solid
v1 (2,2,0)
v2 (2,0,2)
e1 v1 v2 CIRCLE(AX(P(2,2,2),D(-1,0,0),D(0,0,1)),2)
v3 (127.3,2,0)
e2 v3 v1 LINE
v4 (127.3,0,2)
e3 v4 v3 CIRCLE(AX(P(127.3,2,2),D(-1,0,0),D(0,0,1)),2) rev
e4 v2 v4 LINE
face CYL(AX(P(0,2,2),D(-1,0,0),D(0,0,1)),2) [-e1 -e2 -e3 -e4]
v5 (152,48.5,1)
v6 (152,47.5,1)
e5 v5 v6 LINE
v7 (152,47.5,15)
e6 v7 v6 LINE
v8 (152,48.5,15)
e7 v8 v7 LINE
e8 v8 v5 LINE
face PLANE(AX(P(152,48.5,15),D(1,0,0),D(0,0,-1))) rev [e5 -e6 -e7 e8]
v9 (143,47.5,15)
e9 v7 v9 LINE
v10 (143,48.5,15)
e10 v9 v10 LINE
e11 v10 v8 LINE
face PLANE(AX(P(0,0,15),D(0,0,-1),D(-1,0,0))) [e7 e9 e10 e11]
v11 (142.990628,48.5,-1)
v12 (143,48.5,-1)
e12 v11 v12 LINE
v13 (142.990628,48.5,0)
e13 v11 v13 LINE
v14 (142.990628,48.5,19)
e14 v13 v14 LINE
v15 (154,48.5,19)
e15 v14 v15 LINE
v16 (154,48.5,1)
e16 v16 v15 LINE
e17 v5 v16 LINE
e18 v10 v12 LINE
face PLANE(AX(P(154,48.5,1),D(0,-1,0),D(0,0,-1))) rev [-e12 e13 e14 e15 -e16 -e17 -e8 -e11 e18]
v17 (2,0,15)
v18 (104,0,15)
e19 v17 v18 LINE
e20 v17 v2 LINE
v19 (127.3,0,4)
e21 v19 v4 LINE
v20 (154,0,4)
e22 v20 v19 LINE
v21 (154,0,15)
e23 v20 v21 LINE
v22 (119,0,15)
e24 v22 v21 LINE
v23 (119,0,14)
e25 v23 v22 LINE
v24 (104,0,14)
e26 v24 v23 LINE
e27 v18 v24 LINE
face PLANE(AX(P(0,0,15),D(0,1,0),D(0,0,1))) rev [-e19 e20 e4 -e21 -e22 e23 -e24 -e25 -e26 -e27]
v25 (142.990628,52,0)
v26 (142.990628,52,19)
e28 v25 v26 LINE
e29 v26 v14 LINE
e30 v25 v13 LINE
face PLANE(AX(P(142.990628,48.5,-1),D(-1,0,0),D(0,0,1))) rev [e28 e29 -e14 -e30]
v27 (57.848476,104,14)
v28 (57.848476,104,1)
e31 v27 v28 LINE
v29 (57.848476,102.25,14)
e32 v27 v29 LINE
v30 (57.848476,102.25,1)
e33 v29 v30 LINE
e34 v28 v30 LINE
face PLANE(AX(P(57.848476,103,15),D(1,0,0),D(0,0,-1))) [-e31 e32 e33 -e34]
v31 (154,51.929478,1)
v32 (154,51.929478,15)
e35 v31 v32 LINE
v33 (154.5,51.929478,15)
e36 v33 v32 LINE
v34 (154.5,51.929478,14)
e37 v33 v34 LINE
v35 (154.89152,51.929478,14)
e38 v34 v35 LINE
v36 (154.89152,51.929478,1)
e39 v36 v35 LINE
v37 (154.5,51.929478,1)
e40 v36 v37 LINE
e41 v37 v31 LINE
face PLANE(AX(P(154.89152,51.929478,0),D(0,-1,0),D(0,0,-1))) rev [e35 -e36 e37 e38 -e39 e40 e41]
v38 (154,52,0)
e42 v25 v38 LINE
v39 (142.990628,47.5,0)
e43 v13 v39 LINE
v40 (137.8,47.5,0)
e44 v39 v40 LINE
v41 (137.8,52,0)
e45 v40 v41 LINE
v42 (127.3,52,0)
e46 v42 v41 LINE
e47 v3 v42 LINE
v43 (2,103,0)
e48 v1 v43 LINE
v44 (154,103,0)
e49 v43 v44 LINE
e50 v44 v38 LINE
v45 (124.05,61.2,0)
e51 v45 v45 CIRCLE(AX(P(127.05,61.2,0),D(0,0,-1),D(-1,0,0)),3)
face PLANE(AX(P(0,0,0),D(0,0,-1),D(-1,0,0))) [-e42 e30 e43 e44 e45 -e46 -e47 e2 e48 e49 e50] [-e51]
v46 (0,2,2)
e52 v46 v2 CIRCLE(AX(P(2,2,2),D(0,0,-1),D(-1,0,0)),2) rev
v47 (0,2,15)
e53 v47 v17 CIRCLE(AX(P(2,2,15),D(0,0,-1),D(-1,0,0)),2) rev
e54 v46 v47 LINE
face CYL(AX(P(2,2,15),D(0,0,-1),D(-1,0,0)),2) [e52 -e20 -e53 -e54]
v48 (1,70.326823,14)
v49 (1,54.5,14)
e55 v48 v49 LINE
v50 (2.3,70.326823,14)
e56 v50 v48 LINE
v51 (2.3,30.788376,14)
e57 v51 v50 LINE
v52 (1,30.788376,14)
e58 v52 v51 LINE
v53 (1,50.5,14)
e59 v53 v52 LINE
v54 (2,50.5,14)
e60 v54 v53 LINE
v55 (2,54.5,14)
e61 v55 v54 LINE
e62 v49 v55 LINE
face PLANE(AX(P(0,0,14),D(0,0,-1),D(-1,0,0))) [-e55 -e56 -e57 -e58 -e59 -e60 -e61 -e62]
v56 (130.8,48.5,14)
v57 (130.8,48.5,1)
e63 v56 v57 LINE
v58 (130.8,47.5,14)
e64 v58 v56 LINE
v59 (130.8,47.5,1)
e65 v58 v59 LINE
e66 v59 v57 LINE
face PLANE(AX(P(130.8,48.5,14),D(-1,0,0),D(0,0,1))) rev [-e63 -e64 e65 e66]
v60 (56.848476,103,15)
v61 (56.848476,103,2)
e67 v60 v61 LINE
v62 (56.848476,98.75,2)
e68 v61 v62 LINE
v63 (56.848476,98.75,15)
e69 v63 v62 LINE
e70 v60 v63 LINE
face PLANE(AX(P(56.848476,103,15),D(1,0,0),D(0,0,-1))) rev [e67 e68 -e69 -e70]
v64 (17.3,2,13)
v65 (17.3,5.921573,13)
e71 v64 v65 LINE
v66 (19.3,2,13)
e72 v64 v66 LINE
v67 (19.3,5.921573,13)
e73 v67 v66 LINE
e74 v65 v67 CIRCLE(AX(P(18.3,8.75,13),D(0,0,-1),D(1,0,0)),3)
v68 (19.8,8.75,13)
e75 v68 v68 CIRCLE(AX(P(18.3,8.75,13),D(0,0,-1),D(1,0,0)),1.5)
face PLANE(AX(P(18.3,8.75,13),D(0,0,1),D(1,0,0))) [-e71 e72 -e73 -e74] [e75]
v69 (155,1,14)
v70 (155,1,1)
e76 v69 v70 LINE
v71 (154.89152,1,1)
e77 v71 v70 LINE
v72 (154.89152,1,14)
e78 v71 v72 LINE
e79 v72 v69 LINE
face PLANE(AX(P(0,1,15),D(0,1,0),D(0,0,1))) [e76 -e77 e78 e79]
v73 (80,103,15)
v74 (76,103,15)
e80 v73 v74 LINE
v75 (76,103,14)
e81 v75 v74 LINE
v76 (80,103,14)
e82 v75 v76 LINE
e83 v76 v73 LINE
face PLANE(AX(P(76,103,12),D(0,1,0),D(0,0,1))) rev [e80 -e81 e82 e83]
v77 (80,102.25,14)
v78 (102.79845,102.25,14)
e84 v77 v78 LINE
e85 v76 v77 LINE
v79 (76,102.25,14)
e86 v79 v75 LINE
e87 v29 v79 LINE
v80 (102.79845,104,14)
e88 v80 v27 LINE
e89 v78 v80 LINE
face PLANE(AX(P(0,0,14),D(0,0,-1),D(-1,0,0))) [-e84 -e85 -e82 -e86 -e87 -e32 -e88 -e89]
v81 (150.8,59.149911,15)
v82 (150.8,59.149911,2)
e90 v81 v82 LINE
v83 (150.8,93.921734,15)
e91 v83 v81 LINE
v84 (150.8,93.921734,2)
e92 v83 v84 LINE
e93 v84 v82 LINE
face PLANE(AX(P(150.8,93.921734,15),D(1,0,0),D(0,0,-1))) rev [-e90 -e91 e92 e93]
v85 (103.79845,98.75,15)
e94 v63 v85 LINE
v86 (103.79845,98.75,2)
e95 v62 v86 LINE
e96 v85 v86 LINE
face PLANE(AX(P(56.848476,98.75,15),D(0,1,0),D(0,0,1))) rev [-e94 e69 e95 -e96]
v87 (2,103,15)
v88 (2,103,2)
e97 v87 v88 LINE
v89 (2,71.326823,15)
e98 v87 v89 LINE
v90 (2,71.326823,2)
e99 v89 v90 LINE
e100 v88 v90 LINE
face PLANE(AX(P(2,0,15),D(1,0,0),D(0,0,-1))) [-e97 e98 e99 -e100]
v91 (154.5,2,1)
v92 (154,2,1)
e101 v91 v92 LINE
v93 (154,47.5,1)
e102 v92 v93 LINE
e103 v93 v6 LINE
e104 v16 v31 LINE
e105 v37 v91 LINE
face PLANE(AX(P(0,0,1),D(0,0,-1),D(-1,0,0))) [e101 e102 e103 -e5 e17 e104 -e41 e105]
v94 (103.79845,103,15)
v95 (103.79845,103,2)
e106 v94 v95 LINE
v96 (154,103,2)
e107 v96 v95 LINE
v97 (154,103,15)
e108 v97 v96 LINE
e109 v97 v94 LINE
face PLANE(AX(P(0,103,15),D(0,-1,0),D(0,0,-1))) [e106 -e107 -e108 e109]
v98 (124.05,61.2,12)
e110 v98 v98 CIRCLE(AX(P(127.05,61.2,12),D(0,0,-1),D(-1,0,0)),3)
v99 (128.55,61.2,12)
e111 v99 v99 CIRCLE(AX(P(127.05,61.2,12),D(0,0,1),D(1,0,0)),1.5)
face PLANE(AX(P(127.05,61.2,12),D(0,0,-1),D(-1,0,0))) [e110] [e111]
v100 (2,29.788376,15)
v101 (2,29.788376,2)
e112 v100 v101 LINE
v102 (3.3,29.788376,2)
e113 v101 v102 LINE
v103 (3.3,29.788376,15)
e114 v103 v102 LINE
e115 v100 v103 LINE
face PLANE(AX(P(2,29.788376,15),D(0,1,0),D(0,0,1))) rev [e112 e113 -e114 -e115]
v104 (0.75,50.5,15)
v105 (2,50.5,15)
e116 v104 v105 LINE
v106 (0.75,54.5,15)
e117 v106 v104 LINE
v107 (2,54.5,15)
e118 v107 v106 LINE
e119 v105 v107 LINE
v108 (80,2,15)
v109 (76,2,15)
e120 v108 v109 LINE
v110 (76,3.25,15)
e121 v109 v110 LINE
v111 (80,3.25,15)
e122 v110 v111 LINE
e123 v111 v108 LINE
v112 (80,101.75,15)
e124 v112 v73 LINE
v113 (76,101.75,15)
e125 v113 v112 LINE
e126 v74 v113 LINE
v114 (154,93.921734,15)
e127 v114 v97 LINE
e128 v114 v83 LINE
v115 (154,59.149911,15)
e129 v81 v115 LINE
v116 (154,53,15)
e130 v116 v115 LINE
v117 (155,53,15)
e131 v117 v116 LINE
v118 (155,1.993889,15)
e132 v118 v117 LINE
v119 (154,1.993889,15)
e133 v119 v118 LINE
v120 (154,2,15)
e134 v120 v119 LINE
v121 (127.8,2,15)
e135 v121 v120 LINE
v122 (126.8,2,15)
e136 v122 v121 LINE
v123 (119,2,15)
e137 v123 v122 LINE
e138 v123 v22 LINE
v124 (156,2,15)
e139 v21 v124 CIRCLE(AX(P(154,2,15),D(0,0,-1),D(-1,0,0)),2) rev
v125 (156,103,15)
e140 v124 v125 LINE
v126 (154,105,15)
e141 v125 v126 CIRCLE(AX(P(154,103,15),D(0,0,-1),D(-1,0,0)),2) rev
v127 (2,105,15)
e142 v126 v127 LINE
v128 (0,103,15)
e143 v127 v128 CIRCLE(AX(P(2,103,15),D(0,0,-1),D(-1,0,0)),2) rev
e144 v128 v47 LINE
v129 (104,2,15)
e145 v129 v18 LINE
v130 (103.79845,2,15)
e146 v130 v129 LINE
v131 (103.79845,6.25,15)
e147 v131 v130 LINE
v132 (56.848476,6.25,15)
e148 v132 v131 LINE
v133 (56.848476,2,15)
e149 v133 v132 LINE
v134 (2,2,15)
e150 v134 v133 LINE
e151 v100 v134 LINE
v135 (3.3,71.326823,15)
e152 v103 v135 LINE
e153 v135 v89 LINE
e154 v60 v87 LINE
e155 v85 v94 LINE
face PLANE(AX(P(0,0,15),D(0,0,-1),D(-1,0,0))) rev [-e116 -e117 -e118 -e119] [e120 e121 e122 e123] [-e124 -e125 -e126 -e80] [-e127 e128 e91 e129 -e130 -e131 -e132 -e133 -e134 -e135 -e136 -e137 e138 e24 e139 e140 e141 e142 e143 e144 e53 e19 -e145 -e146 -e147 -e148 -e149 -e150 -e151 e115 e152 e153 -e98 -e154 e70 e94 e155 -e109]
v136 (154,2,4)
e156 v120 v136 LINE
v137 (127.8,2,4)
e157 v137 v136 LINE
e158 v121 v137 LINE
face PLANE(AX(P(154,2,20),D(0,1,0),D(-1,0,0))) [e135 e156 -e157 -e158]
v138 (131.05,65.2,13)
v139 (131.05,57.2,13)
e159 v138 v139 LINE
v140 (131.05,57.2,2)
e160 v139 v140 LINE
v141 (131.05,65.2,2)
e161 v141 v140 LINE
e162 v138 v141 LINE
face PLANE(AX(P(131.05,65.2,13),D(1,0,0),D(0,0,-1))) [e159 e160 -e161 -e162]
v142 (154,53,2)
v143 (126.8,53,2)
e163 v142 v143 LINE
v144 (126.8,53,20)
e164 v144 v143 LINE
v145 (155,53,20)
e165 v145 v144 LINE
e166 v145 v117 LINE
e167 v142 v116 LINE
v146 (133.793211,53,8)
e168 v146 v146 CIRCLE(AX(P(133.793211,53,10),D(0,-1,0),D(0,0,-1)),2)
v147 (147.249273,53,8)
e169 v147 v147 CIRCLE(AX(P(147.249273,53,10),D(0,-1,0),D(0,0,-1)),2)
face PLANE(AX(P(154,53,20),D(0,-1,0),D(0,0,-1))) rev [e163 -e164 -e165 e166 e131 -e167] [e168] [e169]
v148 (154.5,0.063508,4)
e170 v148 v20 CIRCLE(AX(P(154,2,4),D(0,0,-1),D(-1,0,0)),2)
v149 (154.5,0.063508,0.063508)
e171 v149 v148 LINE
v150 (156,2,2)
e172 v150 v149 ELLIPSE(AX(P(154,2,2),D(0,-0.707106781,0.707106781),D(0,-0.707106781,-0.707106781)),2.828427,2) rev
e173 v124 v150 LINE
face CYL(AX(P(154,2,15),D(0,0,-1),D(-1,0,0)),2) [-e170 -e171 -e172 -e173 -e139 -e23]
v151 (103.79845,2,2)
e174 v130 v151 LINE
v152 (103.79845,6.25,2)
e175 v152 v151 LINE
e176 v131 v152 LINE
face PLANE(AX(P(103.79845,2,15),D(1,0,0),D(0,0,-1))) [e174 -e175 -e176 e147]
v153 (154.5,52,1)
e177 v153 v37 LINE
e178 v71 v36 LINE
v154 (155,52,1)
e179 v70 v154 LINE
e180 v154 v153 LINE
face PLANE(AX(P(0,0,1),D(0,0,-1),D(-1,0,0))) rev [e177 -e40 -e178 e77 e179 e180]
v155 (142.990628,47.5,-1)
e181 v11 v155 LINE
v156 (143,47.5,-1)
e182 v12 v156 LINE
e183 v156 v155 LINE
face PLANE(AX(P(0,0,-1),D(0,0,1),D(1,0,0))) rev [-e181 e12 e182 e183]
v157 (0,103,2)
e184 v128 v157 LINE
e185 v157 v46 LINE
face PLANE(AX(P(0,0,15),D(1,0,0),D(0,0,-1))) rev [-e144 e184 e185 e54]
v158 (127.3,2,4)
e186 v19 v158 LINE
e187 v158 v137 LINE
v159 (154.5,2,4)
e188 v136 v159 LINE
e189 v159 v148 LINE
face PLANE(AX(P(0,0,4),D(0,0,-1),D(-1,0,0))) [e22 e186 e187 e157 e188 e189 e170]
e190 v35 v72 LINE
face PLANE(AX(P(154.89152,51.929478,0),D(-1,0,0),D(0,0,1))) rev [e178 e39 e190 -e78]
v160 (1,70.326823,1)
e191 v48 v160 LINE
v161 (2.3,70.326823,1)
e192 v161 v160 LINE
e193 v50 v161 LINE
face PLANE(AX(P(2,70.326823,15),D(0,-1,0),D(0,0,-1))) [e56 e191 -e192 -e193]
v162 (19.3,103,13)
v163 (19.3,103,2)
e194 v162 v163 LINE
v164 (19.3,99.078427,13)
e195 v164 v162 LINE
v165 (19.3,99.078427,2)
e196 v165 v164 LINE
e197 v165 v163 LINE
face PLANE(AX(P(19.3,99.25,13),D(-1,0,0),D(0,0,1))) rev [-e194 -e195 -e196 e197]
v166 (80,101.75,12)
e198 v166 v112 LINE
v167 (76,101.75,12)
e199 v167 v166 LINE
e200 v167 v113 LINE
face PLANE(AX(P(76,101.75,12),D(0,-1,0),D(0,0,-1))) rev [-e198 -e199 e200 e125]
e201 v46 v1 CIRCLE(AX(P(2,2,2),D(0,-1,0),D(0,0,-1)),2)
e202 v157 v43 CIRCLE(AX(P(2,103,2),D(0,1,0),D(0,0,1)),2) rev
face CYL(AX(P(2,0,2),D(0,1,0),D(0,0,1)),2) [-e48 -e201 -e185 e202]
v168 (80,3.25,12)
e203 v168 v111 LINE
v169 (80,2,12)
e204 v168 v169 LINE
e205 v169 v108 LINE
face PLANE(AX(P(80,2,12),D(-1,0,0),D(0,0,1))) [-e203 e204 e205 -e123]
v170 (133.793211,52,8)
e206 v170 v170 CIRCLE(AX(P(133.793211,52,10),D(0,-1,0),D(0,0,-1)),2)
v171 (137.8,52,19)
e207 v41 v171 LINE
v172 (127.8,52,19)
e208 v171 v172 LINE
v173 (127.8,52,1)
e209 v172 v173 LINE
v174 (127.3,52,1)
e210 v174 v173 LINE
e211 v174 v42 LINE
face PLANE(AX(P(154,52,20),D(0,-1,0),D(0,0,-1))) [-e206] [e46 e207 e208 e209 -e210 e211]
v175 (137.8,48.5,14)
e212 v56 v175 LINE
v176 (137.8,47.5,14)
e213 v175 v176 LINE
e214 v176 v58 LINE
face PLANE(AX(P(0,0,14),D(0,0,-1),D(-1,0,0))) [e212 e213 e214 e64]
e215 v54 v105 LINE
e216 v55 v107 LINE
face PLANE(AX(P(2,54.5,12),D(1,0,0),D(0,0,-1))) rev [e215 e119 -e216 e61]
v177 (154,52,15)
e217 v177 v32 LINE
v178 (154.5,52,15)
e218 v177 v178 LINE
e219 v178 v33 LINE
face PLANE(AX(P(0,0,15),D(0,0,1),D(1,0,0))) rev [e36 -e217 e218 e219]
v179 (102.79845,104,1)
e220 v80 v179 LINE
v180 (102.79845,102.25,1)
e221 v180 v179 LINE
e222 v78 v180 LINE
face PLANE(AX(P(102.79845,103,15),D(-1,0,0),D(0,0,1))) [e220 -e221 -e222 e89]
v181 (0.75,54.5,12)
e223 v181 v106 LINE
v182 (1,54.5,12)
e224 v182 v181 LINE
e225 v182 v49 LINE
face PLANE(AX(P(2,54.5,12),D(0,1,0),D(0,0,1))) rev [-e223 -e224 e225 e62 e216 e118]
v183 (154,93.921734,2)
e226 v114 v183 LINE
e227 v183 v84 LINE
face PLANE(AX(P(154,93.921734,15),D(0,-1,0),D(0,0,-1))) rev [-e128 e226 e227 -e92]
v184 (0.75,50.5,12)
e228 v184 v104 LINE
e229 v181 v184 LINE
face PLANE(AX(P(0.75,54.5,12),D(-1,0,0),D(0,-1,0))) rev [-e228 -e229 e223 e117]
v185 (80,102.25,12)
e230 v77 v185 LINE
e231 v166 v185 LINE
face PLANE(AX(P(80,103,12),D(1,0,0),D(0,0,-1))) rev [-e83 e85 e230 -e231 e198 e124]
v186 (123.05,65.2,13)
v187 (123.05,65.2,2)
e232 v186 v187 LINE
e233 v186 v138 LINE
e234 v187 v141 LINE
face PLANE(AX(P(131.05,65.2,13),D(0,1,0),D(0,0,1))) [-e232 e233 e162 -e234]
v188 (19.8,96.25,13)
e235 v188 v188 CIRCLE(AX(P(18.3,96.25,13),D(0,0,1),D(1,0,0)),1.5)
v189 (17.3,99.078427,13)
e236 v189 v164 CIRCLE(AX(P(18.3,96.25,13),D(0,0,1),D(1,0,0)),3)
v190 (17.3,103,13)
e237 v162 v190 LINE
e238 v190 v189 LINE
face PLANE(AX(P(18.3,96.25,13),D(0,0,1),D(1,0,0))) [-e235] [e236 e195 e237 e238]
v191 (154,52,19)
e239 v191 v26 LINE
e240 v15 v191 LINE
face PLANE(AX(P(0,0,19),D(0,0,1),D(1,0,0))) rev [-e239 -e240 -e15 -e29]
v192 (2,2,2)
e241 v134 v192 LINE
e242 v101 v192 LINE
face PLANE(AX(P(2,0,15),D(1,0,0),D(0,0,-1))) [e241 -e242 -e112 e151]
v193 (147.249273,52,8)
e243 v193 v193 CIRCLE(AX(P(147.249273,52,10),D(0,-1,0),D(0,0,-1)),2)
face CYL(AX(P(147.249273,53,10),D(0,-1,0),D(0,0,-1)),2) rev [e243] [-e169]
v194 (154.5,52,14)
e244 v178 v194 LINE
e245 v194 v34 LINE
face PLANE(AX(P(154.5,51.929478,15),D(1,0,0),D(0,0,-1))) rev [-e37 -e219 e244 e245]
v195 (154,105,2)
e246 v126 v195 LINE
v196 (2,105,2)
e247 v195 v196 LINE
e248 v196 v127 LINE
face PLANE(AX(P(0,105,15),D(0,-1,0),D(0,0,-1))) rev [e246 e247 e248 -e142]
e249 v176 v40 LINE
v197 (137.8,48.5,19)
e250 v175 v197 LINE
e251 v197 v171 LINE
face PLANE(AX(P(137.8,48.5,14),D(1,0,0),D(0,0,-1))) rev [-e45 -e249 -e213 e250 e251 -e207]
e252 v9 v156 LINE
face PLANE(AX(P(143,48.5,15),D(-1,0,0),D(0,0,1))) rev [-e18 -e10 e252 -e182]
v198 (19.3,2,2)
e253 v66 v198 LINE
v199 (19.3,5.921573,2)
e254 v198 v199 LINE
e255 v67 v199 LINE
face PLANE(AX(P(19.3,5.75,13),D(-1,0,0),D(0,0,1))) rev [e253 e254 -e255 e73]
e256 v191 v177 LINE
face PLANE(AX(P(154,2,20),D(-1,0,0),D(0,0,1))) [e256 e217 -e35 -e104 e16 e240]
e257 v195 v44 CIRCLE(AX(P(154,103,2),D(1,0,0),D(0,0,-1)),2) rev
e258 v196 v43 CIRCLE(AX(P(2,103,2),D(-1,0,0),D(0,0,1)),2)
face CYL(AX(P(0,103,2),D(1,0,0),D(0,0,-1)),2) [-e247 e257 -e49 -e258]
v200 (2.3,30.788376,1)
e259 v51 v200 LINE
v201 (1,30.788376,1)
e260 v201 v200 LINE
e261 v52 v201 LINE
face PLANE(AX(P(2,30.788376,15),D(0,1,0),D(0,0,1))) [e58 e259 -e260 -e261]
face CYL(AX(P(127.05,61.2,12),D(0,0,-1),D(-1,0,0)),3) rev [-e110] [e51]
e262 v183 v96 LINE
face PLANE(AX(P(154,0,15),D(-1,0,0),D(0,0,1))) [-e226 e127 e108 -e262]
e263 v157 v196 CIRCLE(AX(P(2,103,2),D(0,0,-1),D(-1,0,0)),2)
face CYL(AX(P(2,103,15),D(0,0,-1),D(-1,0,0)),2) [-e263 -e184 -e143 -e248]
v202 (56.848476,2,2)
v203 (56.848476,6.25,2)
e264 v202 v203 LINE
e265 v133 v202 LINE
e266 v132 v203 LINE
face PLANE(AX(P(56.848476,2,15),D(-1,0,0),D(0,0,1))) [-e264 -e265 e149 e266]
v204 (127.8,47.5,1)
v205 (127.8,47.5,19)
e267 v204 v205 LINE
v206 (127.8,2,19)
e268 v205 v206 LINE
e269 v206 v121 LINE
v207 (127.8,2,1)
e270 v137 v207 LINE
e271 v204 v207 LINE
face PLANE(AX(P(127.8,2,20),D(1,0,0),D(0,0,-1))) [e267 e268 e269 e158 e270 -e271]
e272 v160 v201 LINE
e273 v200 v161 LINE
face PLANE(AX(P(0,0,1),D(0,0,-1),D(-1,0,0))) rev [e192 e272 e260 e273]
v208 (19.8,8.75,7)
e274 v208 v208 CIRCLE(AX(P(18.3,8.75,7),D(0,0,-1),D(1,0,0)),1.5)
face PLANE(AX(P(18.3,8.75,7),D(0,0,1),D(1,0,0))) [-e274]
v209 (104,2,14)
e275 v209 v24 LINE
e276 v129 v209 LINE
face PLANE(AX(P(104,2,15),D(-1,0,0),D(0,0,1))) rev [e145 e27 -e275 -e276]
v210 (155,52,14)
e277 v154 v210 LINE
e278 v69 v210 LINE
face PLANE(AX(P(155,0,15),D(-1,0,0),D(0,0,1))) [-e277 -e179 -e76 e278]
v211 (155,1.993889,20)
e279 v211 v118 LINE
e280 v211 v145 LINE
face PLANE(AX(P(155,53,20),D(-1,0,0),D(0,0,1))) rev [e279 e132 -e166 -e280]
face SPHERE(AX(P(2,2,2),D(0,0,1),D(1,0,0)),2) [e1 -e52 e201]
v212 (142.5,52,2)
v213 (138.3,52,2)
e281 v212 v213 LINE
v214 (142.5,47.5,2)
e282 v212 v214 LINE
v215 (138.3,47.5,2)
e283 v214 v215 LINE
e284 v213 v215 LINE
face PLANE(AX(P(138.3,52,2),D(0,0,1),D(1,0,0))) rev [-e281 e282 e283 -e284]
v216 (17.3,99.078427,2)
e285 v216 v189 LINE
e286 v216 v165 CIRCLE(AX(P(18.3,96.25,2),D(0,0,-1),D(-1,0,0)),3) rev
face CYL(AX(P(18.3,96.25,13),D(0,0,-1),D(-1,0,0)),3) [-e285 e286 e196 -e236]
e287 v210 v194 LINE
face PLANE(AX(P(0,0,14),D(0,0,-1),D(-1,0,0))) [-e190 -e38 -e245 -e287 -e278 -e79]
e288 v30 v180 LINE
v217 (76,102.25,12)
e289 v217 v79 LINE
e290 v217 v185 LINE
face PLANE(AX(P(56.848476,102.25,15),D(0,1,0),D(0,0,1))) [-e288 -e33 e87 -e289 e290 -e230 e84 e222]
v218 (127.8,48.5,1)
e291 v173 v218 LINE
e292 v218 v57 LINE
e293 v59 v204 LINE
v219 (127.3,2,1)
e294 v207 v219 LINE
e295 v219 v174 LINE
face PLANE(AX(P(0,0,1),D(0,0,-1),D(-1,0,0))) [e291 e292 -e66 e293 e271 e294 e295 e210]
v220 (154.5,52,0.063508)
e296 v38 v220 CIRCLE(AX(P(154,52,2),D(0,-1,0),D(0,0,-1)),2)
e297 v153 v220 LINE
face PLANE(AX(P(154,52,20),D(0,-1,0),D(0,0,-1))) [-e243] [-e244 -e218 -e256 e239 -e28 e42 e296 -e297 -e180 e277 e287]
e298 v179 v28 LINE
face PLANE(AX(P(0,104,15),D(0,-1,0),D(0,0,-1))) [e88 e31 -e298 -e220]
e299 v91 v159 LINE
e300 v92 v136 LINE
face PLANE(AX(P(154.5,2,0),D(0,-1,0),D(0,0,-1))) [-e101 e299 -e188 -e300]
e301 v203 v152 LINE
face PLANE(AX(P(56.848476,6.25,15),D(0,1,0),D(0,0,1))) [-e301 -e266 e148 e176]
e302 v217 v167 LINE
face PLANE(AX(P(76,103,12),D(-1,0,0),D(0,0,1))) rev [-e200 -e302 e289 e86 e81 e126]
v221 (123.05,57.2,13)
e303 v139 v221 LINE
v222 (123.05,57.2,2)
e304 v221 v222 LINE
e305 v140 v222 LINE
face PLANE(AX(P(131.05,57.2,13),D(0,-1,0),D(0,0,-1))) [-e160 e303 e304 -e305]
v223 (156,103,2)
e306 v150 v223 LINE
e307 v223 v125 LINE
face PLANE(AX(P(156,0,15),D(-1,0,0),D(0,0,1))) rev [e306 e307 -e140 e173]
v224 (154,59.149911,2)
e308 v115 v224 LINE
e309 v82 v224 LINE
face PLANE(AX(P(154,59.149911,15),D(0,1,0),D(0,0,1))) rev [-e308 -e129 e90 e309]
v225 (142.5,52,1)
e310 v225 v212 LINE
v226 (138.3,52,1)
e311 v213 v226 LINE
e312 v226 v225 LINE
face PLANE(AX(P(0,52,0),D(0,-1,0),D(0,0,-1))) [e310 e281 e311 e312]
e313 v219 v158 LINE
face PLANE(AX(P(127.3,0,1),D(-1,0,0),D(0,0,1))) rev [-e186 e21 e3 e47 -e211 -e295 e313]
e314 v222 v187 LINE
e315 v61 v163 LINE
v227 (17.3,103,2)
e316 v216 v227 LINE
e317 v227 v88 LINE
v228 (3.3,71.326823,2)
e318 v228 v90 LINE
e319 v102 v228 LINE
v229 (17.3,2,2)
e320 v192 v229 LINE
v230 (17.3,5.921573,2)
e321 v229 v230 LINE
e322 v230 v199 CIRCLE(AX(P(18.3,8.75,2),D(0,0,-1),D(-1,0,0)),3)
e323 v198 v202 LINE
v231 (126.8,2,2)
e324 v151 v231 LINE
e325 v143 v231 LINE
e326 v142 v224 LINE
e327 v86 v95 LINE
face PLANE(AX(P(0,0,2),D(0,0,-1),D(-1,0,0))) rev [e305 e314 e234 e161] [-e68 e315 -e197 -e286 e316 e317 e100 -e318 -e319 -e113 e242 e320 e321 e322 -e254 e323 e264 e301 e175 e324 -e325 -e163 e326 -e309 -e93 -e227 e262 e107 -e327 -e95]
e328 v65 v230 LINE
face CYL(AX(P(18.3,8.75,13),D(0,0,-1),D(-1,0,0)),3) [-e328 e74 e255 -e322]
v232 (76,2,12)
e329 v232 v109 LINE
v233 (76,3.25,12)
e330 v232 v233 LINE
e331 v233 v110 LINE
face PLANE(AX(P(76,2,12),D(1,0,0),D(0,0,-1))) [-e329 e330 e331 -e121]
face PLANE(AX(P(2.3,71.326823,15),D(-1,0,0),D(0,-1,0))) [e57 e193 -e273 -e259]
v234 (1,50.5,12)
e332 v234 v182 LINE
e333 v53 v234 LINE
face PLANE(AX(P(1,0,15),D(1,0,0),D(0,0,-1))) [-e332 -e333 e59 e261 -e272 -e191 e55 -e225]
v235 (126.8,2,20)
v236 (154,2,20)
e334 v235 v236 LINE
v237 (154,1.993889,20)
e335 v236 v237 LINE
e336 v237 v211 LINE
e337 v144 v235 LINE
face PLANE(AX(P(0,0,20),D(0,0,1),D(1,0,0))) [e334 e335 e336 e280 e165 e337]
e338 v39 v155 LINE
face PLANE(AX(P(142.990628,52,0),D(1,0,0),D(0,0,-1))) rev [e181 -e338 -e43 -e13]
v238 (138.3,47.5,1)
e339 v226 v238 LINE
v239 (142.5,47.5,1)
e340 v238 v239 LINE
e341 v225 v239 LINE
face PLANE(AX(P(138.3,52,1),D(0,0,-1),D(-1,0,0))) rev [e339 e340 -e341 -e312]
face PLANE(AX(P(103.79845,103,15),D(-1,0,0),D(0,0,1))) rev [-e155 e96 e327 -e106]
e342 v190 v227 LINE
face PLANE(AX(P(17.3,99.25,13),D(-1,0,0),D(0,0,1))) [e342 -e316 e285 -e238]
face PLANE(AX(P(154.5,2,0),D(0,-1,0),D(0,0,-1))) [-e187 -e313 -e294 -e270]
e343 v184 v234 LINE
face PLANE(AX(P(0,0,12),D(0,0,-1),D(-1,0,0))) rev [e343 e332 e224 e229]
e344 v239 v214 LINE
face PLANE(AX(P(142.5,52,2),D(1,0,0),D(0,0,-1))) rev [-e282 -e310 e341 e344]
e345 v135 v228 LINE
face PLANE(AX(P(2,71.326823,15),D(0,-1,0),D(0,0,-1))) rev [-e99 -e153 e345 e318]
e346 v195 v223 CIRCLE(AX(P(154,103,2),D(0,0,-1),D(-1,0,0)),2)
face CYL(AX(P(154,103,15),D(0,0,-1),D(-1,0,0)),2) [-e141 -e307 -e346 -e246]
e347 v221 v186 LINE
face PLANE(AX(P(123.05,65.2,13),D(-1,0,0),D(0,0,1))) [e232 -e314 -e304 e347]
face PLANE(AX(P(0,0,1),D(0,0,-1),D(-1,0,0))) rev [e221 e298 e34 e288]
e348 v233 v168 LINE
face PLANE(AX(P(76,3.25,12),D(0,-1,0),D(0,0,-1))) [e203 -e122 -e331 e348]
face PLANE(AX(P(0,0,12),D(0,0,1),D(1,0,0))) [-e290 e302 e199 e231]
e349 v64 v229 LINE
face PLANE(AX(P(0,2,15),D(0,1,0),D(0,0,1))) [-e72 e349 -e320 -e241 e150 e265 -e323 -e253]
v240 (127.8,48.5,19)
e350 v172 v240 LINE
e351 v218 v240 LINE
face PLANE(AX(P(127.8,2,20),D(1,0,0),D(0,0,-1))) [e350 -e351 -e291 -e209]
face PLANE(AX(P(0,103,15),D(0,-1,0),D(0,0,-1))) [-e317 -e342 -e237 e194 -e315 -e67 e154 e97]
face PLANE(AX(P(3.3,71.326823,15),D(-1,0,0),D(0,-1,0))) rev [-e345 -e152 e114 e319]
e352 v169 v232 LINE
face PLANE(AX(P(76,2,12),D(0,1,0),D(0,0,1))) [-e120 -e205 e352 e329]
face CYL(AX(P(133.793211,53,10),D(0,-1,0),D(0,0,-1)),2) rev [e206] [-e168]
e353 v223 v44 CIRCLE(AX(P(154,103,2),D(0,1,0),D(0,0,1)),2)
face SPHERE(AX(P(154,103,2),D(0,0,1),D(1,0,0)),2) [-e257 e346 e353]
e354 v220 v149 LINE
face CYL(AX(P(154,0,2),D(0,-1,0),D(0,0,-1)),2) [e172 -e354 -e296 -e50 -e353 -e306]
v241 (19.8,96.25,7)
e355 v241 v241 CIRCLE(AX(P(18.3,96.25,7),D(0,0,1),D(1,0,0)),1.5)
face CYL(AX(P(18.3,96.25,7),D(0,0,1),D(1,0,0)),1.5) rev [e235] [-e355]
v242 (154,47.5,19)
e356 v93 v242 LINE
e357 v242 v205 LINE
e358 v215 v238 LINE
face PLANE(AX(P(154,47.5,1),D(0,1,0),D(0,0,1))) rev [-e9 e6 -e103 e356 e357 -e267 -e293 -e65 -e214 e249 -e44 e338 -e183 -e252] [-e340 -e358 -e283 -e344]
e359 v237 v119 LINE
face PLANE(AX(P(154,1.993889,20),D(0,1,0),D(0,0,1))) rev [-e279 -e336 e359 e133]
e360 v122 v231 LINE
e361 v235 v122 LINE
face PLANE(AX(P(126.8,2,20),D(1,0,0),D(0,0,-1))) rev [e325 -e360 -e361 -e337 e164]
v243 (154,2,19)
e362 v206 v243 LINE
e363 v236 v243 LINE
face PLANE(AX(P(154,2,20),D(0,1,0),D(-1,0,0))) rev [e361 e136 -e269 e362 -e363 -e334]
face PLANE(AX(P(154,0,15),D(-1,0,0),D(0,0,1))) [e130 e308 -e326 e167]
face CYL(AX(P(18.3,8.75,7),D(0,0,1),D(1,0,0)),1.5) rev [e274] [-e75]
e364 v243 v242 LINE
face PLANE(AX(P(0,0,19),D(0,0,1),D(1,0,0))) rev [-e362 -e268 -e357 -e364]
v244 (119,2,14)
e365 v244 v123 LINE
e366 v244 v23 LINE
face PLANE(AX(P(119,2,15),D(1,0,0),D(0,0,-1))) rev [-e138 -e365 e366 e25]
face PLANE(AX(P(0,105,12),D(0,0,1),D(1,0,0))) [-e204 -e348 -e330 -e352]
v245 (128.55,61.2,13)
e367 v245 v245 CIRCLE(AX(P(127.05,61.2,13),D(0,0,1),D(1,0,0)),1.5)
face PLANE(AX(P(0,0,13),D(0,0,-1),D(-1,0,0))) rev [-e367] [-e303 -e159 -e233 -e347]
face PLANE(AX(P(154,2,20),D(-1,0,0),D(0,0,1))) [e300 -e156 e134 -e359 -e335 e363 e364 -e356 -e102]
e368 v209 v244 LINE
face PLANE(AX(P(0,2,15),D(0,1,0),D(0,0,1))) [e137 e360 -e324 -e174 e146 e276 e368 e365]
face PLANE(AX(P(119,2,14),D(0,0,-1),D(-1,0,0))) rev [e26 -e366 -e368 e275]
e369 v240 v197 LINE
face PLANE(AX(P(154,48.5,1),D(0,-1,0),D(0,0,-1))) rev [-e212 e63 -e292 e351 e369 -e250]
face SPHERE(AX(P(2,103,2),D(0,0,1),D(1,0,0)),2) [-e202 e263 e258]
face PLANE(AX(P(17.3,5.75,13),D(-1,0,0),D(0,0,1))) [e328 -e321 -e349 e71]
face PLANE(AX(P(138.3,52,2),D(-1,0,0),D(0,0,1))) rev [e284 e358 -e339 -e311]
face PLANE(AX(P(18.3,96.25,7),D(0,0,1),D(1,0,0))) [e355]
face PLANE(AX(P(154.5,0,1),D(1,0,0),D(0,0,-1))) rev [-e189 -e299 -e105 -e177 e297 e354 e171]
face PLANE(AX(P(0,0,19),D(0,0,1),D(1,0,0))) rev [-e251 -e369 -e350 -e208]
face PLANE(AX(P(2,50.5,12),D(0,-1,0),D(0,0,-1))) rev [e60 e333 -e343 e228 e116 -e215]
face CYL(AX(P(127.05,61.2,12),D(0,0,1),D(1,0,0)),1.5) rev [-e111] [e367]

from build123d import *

# Parameters (mm, degrees)
SKETCH2_W                = 156
SKETCH2_H                = 105
BOSS_EXTRUDE1_DEPTH      = 15
SHELL1_T                 = -2
SKETCH16_W               = 1.3
SKETCH16_H               = 41.538446475
BOSS_EXTRUDE7_DEPTH      = 13
SKETCH17_W               = 46.949973518
SKETCH17_H               = 1.75
BOSS_EXTRUDE8_DEPTH      = 13
SKETCH18_W               = 27.2
SKETCH18_H               = 51
BOSS_EXTRUDE9_DEPTH      = 18
SHELL2_START             = 2
SHELL2_DEPTH             = 50
SHELL2_START_2           = 102.25
SHELL2_2_OUTLINE_W       = 44.949973518
SHELL2_2_OUTLINE_H       = 13
SHELL2_2_DEPTH           = 1.75
SHELL2_START_3           = 30.788376177
SHELL2_3_OUTLINE_W       = 1.3
SHELL2_3_OUTLINE_H       = 13
SHELL2_3_DEPTH           = 39.538446475
SHELL2_START_4           = 1
SHELL2_4_OUTLINE_W       = 27.2
SHELL2_4_OUTLINE_H       = 13
SHELL2_4_DEPTH           = 1
SKETCH19_W               = 26.2
SKETCH19_H               = 52
CUT_EXTRUDE9_DEPTH       = 2
BOSS_EXTRUDE10_REACH     = 190.566
SKETCH24_W               = 0.891520296
SKETCH24_H               = 50.929477882
SKETCH25_W               = 26.2
SKETCH25_H               = 1
BOSS_EXTRUDE11_DEPTH     = 12
SKETCH27_W               = 26.2
SKETCH27_H               = 1
BOSS_EXTRUDE12_DEPTH     = 18
SKETCH28_W               = 9
SKETCH28_H               = 1
CUT_EXTRUDE10_DEPTH      = 14
SKETCH29_W               = 7
SKETCH29_H               = 1
CUT_EXTRUDE11_DEPTH      = 13
SKETCH30_W               = 0.5
SKETCH30_H               = 52
CUT_EXTRUDE12_DEPTH      = 1
SKETCH31_W               = 0.5
SKETCH31_H               = 52
CUT_EXTRUDE13_DEPTH      = 1
SKETCH32_W               = 5.2
SKETCH32_H               = 1
BOSS_EXTRUDE13_DEPTH     = 1
SKETCH34_W               = 5.2
SKETCH34_H               = 1
BOSS_EXTRUDE14_DEPTH     = 1
SKETCH35_W               = 5.190628433
SKETCH35_H               = 3.5
BOSS_EXTRUDE15_DEPTH     = 20
SKETCH38_W               = 0.5
SKETCH38_H               = 0.070522118
CUT_EXTRUDE14_DEPTH      = 1
SKETCH41_R               = 2
CUT_EXTRUDE15_DEPTH      = 1
SKETCH42_R               = 2
CUT_EXTRUDE16_DEPTH      = 1
SKETCH43_W               = 5.190628433
SKETCH43_H               = 4.5
CUT_EXTRUDE17_DEPTH      = 1
SKETCH44_W               = 1
SKETCH44_H               = 51.006111213
BOSS_EXTRUDE16_DEPTH     = 5
SKETCH46_W               = 4.2
SKETCH46_H               = 1
CUT_EXTRUDE18_DEPTH      = 4.5
CUT_EXTRUDE19_DEPTH      = 2
CUT_EXTRUDE19_DEPTH_BACK = 2
SKETCH47_W               = 27.2
SKETCH47_H               = 2
SKETCH50_W               = 3.2
SKETCH50_H               = 34.771823391
BOSS_EXTRUDE17_DEPTH     = 13
SKETCH51_R               = 3
BOSS_EXTRUDE18_DEPTH     = 13
SKETCH54_R               = 1.5
CUT_EXTRUDE20_DEPTH      = 6
SKETCH56_W               = 4
SKETCH56_H               = 1.25
CUT_EXTRUDE21_DEPTH      = 3
SKETCH57_W               = 1.25
SKETCH57_H               = 4
CUT_EXTRUDE22_DEPTH      = 3
SKETCH60_W               = 15
SKETCH60_H               = 1
CUT_EXTRUDE24_DEPTH      = 2
SKETCH62_W               = 8
SKETCH62_H               = 8
BOSS_EXTRUDE19_DEPTH     = 13
SKETCH64_R               = 3
CUT_EXTRUDE25_DEPTH      = 12
SKETCH63_R               = 1.5
CUT_EXTRUDE26_DEPTH      = 1
FILLET1_R                = 2
SKETCH66_W               = 46.949973518
SKETCH66_H               = 2.5
BOSS_EXTRUDE20_DEPTH     = 13
RIB1_REACH               = 190.566
SKETCH69_WALLS_W         = 2
SKETCH69_WALLS_H         = 382.881276878
RIB2_REACH               = 190.566
SKETCH70_WALLS_W         = 2
SKETCH70_WALLS_H         = 382.881276878


# Read off the part's stored shape, not the designer's step: Shell2
with BuildPart() as part:
    # Sketch2 → Boss-Extrude1 (new body)
    with BuildSketch(Plane.XY):
        with Locations((78, 52.5)):
            Rectangle(SKETCH2_W, SKETCH2_H)
    extrude(amount=BOSS_EXTRUDE1_DEPTH)

    # Shell1
    shell1_openings = [part.faces().sort_by_distance(p)[0] for p in [
        (78, 52.5, 15),
    ]]
    offset(amount=SHELL1_T, openings=shell1_openings, kind=Kind.INTERSECTION)

    # Sketch16 → Boss-Extrude7 (add)
    with BuildSketch(Plane.XY.offset(2)):
        with Locations((2.65, 50.557599415)):
            Rectangle(SKETCH16_W, SKETCH16_H)
    extrude(amount=BOSS_EXTRUDE7_DEPTH)

    # Sketch17 → Boss-Extrude8 (add)
    with BuildSketch(Plane.XY.offset(2)):
        with Locations((80.323462853, 102.125)):
            Rectangle(SKETCH17_W, SKETCH17_H)
    boss_extrude8 = extrude(amount=BOSS_EXTRUDE8_DEPTH)

    # Sketch18 → Boss-Extrude9 (add)
    with BuildSketch(Plane.XY.offset(2)):
        with Locations((140.4, 27.5)):
            Rectangle(SKETCH18_W, SKETCH18_H)
    extrude(amount=BOSS_EXTRUDE9_DEPTH)

    # Shell2 outline → Shell2 (cut)
    with BuildSketch(Plane(origin=(0, 0, 0), x_dir=(1, 0, 0), z_dir=(0, 1, 0)).offset(SHELL2_START)):
        Polygon((127.8, -1), (127.8, -19), (154, -19), (154, -14), (155, -14), (155, -1), align=None)
    extrude(amount=SHELL2_DEPTH, mode=Mode.SUBTRACT)

    # Shell2 2 outline → Shell2 2 (cut)
    with BuildSketch(Plane(origin=(0, 0, 0), x_dir=(1, 0, 0), z_dir=(0, 1, 0)).offset(SHELL2_START_2)):
        with Locations((80.323462853, -7.5)):
            Rectangle(SHELL2_2_OUTLINE_W, SHELL2_2_OUTLINE_H)
    extrude(amount=SHELL2_2_DEPTH, mode=Mode.SUBTRACT)

    # Shell2 3 outline → Shell2 3 (cut)
    with BuildSketch(Plane(origin=(0, 0, 0), x_dir=(1, 0, 0), z_dir=(0, 1, 0)).offset(SHELL2_START_3)):
        with Locations((1.65, -7.5)):
            Rectangle(SHELL2_3_OUTLINE_W, SHELL2_3_OUTLINE_H)
    extrude(amount=SHELL2_3_DEPTH, mode=Mode.SUBTRACT)

    # Shell2 4 outline → Shell2 4 (cut)
    with BuildSketch(Plane(origin=(0, 0, 0), x_dir=(1, 0, 0), z_dir=(0, 1, 0)).offset(SHELL2_START_4)):
        with Locations((141.4, -7.5)):
            Rectangle(SHELL2_4_OUTLINE_W, SHELL2_4_OUTLINE_H)
    extrude(amount=SHELL2_4_DEPTH, mode=Mode.SUBTRACT)

    # Sketch19 → Cut-Extrude9 (cut)
    with BuildSketch(Plane(origin=(0, 0, 0), x_dir=(-1, 0, 0), z_dir=(0, 0, -1))):
        with Locations((-140.9, 26)):
            Rectangle(SKETCH19_W, SKETCH19_H)
    extrude(amount=-CUT_EXTRUDE9_DEPTH, mode=Mode.SUBTRACT)

    # Sketch24 → Boss-Extrude10 (add, up to next)
    with BuildSketch(Plane(origin=(0, 0, 14), x_dir=(-1, 0, 0), z_dir=(0, 0, -1)), mode=Mode.PRIVATE) as boss_extrude10_sk1:
        with Locations((-154.445760148, 26.464738941)):
            Rectangle(SKETCH24_W, SKETCH24_H)
    boss_extrude10_tool1 = extrude(boss_extrude10_sk1.sketch, amount=BOSS_EXTRUDE10_REACH, mode=Mode.PRIVATE) - part.part
    add(boss_extrude10_tool1.solids().sort_by_distance((154.44576, 26.464739, 14))[0])

    # Sketch25 → Boss-Extrude11 (add)
    with BuildSketch(Plane(origin=(0, 0, 14), x_dir=(-1, 0, 0), z_dir=(0, 0, -1))):
        with Locations((-140.9, 1.5)):
            Rectangle(SKETCH25_W, SKETCH25_H)
    extrude(amount=BOSS_EXTRUDE11_DEPTH)

    # Sketch27 → Boss-Extrude12 (add)
    with BuildSketch(Plane(origin=(0, 0, 19), x_dir=(-1, 0, 0), z_dir=(0, 0, -1))):
        with Locations((-140.9, 48)):
            Rectangle(SKETCH27_W, SKETCH27_H)
    extrude(amount=BOSS_EXTRUDE12_DEPTH)

    # Sketch28 → Cut-Extrude10 (cut)
    with BuildSketch(Plane(origin=(0, 0, 1), x_dir=(-1, 0, 0), z_dir=(0, 0, -1))):
        with Locations((-147.5, 48)):
            Rectangle(SKETCH28_W, SKETCH28_H)
    extrude(amount=-CUT_EXTRUDE10_DEPTH, mode=Mode.SUBTRACT)

    # Sketch29 → Cut-Extrude11 (cut)
    with BuildSketch(Plane(origin=(0, 0, 1), x_dir=(-1, 0, 0), z_dir=(0, 0, -1))):
        with Locations((-134.3, 48)):
            Rectangle(SKETCH29_W, SKETCH29_H)
    extrude(amount=-CUT_EXTRUDE11_DEPTH, mode=Mode.SUBTRACT)

    # Sketch30 → Cut-Extrude12 (cut)
    with BuildSketch(Plane(origin=(0, 0, 0), x_dir=(-1, 0, 0), z_dir=(0, 0, -1))):
        with Locations((-127.55, 26)):
            Rectangle(SKETCH30_W, SKETCH30_H)
    extrude(amount=-CUT_EXTRUDE12_DEPTH, mode=Mode.SUBTRACT)

    # Sketch31 → Cut-Extrude13 (cut)
    with BuildSketch(Plane(origin=(0, 0, 0), x_dir=(-1, 0, 0), z_dir=(0, 0, -1))):
        with Locations((-154.25, 26)):
            Rectangle(SKETCH31_W, SKETCH31_H)
    extrude(amount=-CUT_EXTRUDE13_DEPTH, mode=Mode.SUBTRACT)

    # Sketch32 → Boss-Extrude13 (add)
    with BuildSketch(Plane(origin=(0, 0, 1), x_dir=(-1, 0, 0), z_dir=(0, 0, -1))):
        with Locations((-140.4, 48)):
            Rectangle(SKETCH32_W, SKETCH32_H)
    extrude(amount=BOSS_EXTRUDE13_DEPTH)

    # Sketch34 → Boss-Extrude14 (add)
    with BuildSketch(Plane(origin=(0, 0, 0), x_dir=(-1, 0, 0), z_dir=(0, 0, -1))):
        with Locations((-140.4, 48)):
            Rectangle(SKETCH34_W, SKETCH34_H)
    extrude(amount=BOSS_EXTRUDE14_DEPTH)

    # Sketch35 → Boss-Extrude15 (add)
    with BuildSketch(Plane(origin=(0, 0, 19), x_dir=(-1, 0, 0), z_dir=(0, 0, -1))):
        with Locations((-140.395314217, 50.25)):
            Rectangle(SKETCH35_W, SKETCH35_H)
    extrude(amount=BOSS_EXTRUDE15_DEPTH)

    # Sketch38 → Cut-Extrude14 (cut)
    with BuildSketch(Plane(origin=(0, 0, 14), x_dir=(-1, 0, 0), z_dir=(0, 0, -1))):
        with Locations((-154.25, 51.964738941)):
            Rectangle(SKETCH38_W, SKETCH38_H)
    extrude(amount=-CUT_EXTRUDE14_DEPTH, mode=Mode.SUBTRACT)

    # Sketch41 → Cut-Extrude15 (cut)
    with BuildSketch(Plane.XZ.offset(-52)):
        with Locations(Location((147.249273033, 10, 0), (0, 0, 270))):
            Circle(SKETCH41_R)
    extrude(amount=-CUT_EXTRUDE15_DEPTH, mode=Mode.SUBTRACT)

    # Sketch42 → Cut-Extrude16 (cut)
    with BuildSketch(Plane.XZ.offset(-52)):
        with Locations(Location((133.793210636, 10, 0), (0, 0, 270))):
            Circle(SKETCH42_R)
    extrude(amount=-CUT_EXTRUDE16_DEPTH, mode=Mode.SUBTRACT)

    # Sketch43 → Cut-Extrude17 (cut)
    with BuildSketch(Plane(origin=(0, 0, -1), x_dir=(-1, 0, 0), z_dir=(0, 0, -1))):
        with Locations((-140.395314217, 49.75)):
            Rectangle(SKETCH43_W, SKETCH43_H)
    extrude(amount=-CUT_EXTRUDE17_DEPTH, mode=Mode.SUBTRACT)

    # Sketch44 → Boss-Extrude16 (add)
    with BuildSketch(Plane.XY.offset(15)):
        with Locations((154.5, 27.496944394)):
            Rectangle(SKETCH44_W, SKETCH44_H)
    extrude(amount=BOSS_EXTRUDE16_DEPTH)

    # Sketch46 → Cut-Extrude18 (cut)
    with BuildSketch(Plane.XZ.offset(-47.5)):
        with Locations((140.4, 1.5)):
            Rectangle(SKETCH46_W, SKETCH46_H)
    extrude(amount=-CUT_EXTRUDE18_DEPTH, mode=Mode.SUBTRACT)

    # Sketch47 → Cut-Extrude19 (cut, two sides: drawn at the far end of the back side and taken through both)
    with BuildSketch(Plane(origin=(0, 0, 2), x_dir=(-1, 0, 0), z_dir=(0, 0, -1)).offset(-CUT_EXTRUDE19_DEPTH_BACK)):
        with Locations((-140.9, 1)):
            Rectangle(SKETCH47_W, SKETCH47_H)
    extrude(amount=CUT_EXTRUDE19_DEPTH + CUT_EXTRUDE19_DEPTH_BACK, mode=Mode.SUBTRACT)

    # Mirror3: Boss-Extrude8 across plane
    add(boss_extrude8.mirror(Plane(origin=(0, 52.5, 0), x_dir=(0, 0, 1), z_dir=(0, -1, 0))))

    # Sketch50 → Boss-Extrude17 (add)
    with BuildSketch(Plane.XY.offset(2)):
        with Locations((152.4, 76.53582262)):
            Rectangle(SKETCH50_W, SKETCH50_H)
    extrude(amount=BOSS_EXTRUDE17_DEPTH)

    # Sketch51 → Boss-Extrude18 (add)
    with BuildSketch(Plane.XY):
        with Locations(Location((18.3, 96.25, 0), (0, 0, 180))):
            Circle(SKETCH51_R)
    boss_extrude18 = extrude(amount=BOSS_EXTRUDE18_DEPTH)

    # Sketch54 → Cut-Extrude20 (cut)
    with BuildSketch(Plane.XY.offset(13)):
        with Locations((18.3, 96.25)):
            Circle(SKETCH54_R)
    cut_extrude20 = extrude(amount=-CUT_EXTRUDE20_DEPTH, mode=Mode.SUBTRACT)

    # Mirror4: Boss-Extrude18, Cut-Extrude20 across plane
    add(boss_extrude18.mirror(Plane(origin=(0, 52.5, 0), x_dir=(0, 0, 1), z_dir=(0, -1, 0))))
    add(cut_extrude20.mirror(Plane(origin=(0, 52.5, 0), x_dir=(0, 0, 1), z_dir=(0, -1, 0))), mode=Mode.SUBTRACT)

    # Sketch56 → Cut-Extrude21 (cut)
    with BuildSketch(Plane.XY.offset(15)):
        with Locations((78, 102.375)):
            Rectangle(SKETCH56_W, SKETCH56_H)
    cut_extrude21 = extrude(amount=-CUT_EXTRUDE21_DEPTH, mode=Mode.SUBTRACT)

    # Mirror5: Cut-Extrude21 across plane
    add(cut_extrude21.mirror(Plane(origin=(0, 52.5, 0), x_dir=(0, 0, 1), z_dir=(0, -1, 0))), mode=Mode.SUBTRACT)

    # Sketch57 → Cut-Extrude22 (cut)
    with BuildSketch(Plane.XY.offset(15)):
        with Locations((1.375, 52.5)):
            Rectangle(SKETCH57_W, SKETCH57_H)
    extrude(amount=-CUT_EXTRUDE22_DEPTH, mode=Mode.SUBTRACT)

    # Sketch60 → Cut-Extrude24 (cut)
    with BuildSketch(Plane.XZ):
        with Locations((111.5, 14.5)):
            Rectangle(SKETCH60_W, SKETCH60_H)
    extrude(amount=-CUT_EXTRUDE24_DEPTH, mode=Mode.SUBTRACT)

    # Sketch62 → Boss-Extrude19 (add)
    with BuildSketch(Plane(origin=(0, 0, 0), x_dir=(-1, 0, 0), z_dir=(0, 0, -1))):
        with Locations((-127.05, 61.2)):
            Rectangle(SKETCH62_W, SKETCH62_H)
    extrude(amount=-BOSS_EXTRUDE19_DEPTH)

    # Sketch64 → Cut-Extrude25 (cut)
    with BuildSketch(Plane(origin=(0, 0, 0), x_dir=(-1, 0, 0), z_dir=(0, 0, -1))):
        with Locations((-127.05, 61.2)):
            Circle(SKETCH64_R)
    extrude(amount=-CUT_EXTRUDE25_DEPTH, mode=Mode.SUBTRACT)

    # Sketch63 → Cut-Extrude26 (cut)
    with BuildSketch(Plane.XY.offset(13)):
        with Locations((127.05, 61.2)):
            Circle(SKETCH63_R)
    extrude(amount=-CUT_EXTRUDE26_DEPTH, mode=Mode.SUBTRACT)

    # Fillet1
    # the kernel refuses this fillet: 2 mm, written as the material it takes off along each edge
    with BuildSketch(Plane(origin=(2, 2, 2), x_dir=(0, 0, -1), z_dir=(0, -1, 0))) as fillet1_piece_1_section:
        Polygon((0, 0), (FILLET1_R, 0), (FILLET1_R, -FILLET1_R), (0, -FILLET1_R), align=None)
    fillet1_piece_1 = extrude(amount=FILLET1_R, mode=Mode.PRIVATE)
    fillet1_piece_1 = fillet1_piece_1 - Plane(origin=(2, 2, 2), x_dir=(0.7071067811865475, 0, 0.7071067811865475), z_dir=(0, -1, 0)) * Sphere(FILLET1_R, mode=Mode.PRIVATE)
    add(fillet1_piece_1, mode=Mode.SUBTRACT)
    with BuildSketch(Plane(origin=(2, 103, 2), x_dir=(-1, 0, 0), z_dir=(0, 0, -1))) as fillet1_piece_2_section:
        Polygon((0, 0), (FILLET1_R, 0), (FILLET1_R, FILLET1_R), (0, FILLET1_R), align=None)
    fillet1_piece_2 = extrude(amount=FILLET1_R, mode=Mode.PRIVATE)
    fillet1_piece_2 = fillet1_piece_2 - Plane(origin=(2, 103, 2), x_dir=(0.7071067811865475, -0.7071067811865475, 0), z_dir=(0, 0, -1)) * Sphere(FILLET1_R, mode=Mode.PRIVATE)
    add(fillet1_piece_2, mode=Mode.SUBTRACT)
    with BuildSketch(Plane(origin=(154, 103, 2), x_dir=(0, 1, 0), z_dir=(0, 0, -1))) as fillet1_piece_3_section:
        Polygon((0, 0), (FILLET1_R, 0), (FILLET1_R, FILLET1_R), (0, FILLET1_R), align=None)
    fillet1_piece_3 = extrude(amount=FILLET1_R, mode=Mode.PRIVATE)
    fillet1_piece_3 = fillet1_piece_3 - Plane(origin=(154, 103, 2), x_dir=(-0.7071067811865475, -0.7071067811865475, 0), z_dir=(0, 0, -1)) * Sphere(FILLET1_R, mode=Mode.PRIVATE)
    add(fillet1_piece_3, mode=Mode.SUBTRACT)
    with BuildSketch(Plane(origin=(0, 0, 2), x_dir=(1, 0, 0), z_dir=(0, 0, 1)), Plane(origin=(0, 105, 2), x_dir=(0, -1, 0), z_dir=(0, 0, 1))) as fillet1_piece_4:
        with BuildLine():
            CenterArc((FILLET1_R, FILLET1_R), FILLET1_R, 180, 90)
            Line((0, FILLET1_R), (0, 0))
            Line((0, 0), (FILLET1_R, 0))
        make_face()
    extrude(amount=18, mode=Mode.SUBTRACT)
    with BuildSketch(Plane(origin=(156, 0, -5), x_dir=(-1, 0, 0), z_dir=(0, 0, 1))) as fillet1_piece_5:
        with BuildLine():
            CenterArc((FILLET1_R, -FILLET1_R), FILLET1_R, 90, 90)
            Line((0, -FILLET1_R), (0, 0))
            Line((0, 0), (FILLET1_R, 0))
        make_face()
    extrude(amount=25, mode=Mode.SUBTRACT)
    with BuildSketch(Plane(origin=(0, 103, 0), x_dir=(1, 0, 0), z_dir=(0, -1, 0))) as fillet1_piece_6:
        with BuildLine():
            CenterArc((FILLET1_R, FILLET1_R), FILLET1_R, 180, 90)
            Line((0, FILLET1_R), (0, 0))
            Line((0, 0), (FILLET1_R, 0))
        make_face()
    extrude(amount=101, mode=Mode.SUBTRACT)
    with BuildSketch(Plane(origin=(2, 0, 0), x_dir=(0, 0, 1), z_dir=(1, 0, 0))) as fillet1_piece_7:
        with BuildLine():
            CenterArc((FILLET1_R, -FILLET1_R), FILLET1_R, 90, 90)
            Line((0, -FILLET1_R), (0, 0))
            Line((0, 0), (FILLET1_R, 0))
        make_face()
    extrude(amount=130.3, mode=Mode.SUBTRACT)
    with BuildSketch(Plane(origin=(156, -5, 0), x_dir=(-1, 0, 0), z_dir=(0, 1, 0))) as fillet1_piece_8:
        with BuildLine():
            CenterArc((FILLET1_R, FILLET1_R), FILLET1_R, 180, 90)
            Line((0, FILLET1_R), (0, 0))
            Line((0, 0), (FILLET1_R, 0))
        make_face()
    extrude(amount=108, mode=Mode.SUBTRACT)
    with BuildSketch(Plane(origin=(156, 105, 2), x_dir=(0, -1, 0), z_dir=(0, 0, 1))) as fillet1_piece_9:
        with BuildLine():
            CenterArc((FILLET1_R, -FILLET1_R), FILLET1_R, 90, 90)
            Line((0, -FILLET1_R), (0, 0))
            Line((0, 0), (FILLET1_R, 0))
        make_face()
    extrude(amount=18, mode=Mode.SUBTRACT)
    with BuildSketch(Plane(origin=(154, 105, 0), x_dir=(0, -1, 0), z_dir=(-1, 0, 0))) as fillet1_piece_10:
        with BuildLine():
            CenterArc((FILLET1_R, FILLET1_R), FILLET1_R, 180, 90)
            Line((0, FILLET1_R), (0, 0))
            Line((0, 0), (FILLET1_R, 0))
        make_face()
    extrude(amount=152, mode=Mode.SUBTRACT)

    # Sketch66 → Boss-Extrude20 (add)
    with BuildSketch(Plane.XY.offset(2)):
        with Locations((80.323462853, 100)):
            Rectangle(SKETCH66_W, SKETCH66_H)
    boss_extrude20 = extrude(amount=BOSS_EXTRUDE20_DEPTH)

    # Mirror6: Boss-Extrude20 across plane
    add(boss_extrude20.mirror(Plane(origin=(0, 52.5, 0), x_dir=(0, 0, 1), z_dir=(0, -1, 0))))

    # Sketch69 walls → Rib1 (add, up to next)
    with BuildSketch(Plane.XY.offset(13), mode=Mode.PRIVATE) as rib1_sk1:
        with Locations((18.3, 101.125)):
            Rectangle(SKETCH69_WALLS_W, SKETCH69_WALLS_H)
    rib1_tool1 = extrude(rib1_sk1.sketch, amount=-RIB1_REACH, mode=Mode.PRIVATE) - part.part
    add(rib1_tool1.solids().sort_by_distance((18.3, 101.125, 13))[0])

    # Sketch70 walls → Rib2 (add, up to next)
    with BuildSketch(Plane.XY.offset(13), mode=Mode.PRIVATE) as rib2_sk1:
        with Locations((18.3, 3.875)):
            Rectangle(SKETCH70_WALLS_W, SKETCH70_WALLS_H)
    rib2_tool1 = extrude(rib2_sk1.sketch, amount=-RIB2_REACH, mode=Mode.PRIVATE) - part.part
    add(rib2_tool1.solids().sort_by_distance((18.3, 3.875, 13))[0])


solid = part.part
